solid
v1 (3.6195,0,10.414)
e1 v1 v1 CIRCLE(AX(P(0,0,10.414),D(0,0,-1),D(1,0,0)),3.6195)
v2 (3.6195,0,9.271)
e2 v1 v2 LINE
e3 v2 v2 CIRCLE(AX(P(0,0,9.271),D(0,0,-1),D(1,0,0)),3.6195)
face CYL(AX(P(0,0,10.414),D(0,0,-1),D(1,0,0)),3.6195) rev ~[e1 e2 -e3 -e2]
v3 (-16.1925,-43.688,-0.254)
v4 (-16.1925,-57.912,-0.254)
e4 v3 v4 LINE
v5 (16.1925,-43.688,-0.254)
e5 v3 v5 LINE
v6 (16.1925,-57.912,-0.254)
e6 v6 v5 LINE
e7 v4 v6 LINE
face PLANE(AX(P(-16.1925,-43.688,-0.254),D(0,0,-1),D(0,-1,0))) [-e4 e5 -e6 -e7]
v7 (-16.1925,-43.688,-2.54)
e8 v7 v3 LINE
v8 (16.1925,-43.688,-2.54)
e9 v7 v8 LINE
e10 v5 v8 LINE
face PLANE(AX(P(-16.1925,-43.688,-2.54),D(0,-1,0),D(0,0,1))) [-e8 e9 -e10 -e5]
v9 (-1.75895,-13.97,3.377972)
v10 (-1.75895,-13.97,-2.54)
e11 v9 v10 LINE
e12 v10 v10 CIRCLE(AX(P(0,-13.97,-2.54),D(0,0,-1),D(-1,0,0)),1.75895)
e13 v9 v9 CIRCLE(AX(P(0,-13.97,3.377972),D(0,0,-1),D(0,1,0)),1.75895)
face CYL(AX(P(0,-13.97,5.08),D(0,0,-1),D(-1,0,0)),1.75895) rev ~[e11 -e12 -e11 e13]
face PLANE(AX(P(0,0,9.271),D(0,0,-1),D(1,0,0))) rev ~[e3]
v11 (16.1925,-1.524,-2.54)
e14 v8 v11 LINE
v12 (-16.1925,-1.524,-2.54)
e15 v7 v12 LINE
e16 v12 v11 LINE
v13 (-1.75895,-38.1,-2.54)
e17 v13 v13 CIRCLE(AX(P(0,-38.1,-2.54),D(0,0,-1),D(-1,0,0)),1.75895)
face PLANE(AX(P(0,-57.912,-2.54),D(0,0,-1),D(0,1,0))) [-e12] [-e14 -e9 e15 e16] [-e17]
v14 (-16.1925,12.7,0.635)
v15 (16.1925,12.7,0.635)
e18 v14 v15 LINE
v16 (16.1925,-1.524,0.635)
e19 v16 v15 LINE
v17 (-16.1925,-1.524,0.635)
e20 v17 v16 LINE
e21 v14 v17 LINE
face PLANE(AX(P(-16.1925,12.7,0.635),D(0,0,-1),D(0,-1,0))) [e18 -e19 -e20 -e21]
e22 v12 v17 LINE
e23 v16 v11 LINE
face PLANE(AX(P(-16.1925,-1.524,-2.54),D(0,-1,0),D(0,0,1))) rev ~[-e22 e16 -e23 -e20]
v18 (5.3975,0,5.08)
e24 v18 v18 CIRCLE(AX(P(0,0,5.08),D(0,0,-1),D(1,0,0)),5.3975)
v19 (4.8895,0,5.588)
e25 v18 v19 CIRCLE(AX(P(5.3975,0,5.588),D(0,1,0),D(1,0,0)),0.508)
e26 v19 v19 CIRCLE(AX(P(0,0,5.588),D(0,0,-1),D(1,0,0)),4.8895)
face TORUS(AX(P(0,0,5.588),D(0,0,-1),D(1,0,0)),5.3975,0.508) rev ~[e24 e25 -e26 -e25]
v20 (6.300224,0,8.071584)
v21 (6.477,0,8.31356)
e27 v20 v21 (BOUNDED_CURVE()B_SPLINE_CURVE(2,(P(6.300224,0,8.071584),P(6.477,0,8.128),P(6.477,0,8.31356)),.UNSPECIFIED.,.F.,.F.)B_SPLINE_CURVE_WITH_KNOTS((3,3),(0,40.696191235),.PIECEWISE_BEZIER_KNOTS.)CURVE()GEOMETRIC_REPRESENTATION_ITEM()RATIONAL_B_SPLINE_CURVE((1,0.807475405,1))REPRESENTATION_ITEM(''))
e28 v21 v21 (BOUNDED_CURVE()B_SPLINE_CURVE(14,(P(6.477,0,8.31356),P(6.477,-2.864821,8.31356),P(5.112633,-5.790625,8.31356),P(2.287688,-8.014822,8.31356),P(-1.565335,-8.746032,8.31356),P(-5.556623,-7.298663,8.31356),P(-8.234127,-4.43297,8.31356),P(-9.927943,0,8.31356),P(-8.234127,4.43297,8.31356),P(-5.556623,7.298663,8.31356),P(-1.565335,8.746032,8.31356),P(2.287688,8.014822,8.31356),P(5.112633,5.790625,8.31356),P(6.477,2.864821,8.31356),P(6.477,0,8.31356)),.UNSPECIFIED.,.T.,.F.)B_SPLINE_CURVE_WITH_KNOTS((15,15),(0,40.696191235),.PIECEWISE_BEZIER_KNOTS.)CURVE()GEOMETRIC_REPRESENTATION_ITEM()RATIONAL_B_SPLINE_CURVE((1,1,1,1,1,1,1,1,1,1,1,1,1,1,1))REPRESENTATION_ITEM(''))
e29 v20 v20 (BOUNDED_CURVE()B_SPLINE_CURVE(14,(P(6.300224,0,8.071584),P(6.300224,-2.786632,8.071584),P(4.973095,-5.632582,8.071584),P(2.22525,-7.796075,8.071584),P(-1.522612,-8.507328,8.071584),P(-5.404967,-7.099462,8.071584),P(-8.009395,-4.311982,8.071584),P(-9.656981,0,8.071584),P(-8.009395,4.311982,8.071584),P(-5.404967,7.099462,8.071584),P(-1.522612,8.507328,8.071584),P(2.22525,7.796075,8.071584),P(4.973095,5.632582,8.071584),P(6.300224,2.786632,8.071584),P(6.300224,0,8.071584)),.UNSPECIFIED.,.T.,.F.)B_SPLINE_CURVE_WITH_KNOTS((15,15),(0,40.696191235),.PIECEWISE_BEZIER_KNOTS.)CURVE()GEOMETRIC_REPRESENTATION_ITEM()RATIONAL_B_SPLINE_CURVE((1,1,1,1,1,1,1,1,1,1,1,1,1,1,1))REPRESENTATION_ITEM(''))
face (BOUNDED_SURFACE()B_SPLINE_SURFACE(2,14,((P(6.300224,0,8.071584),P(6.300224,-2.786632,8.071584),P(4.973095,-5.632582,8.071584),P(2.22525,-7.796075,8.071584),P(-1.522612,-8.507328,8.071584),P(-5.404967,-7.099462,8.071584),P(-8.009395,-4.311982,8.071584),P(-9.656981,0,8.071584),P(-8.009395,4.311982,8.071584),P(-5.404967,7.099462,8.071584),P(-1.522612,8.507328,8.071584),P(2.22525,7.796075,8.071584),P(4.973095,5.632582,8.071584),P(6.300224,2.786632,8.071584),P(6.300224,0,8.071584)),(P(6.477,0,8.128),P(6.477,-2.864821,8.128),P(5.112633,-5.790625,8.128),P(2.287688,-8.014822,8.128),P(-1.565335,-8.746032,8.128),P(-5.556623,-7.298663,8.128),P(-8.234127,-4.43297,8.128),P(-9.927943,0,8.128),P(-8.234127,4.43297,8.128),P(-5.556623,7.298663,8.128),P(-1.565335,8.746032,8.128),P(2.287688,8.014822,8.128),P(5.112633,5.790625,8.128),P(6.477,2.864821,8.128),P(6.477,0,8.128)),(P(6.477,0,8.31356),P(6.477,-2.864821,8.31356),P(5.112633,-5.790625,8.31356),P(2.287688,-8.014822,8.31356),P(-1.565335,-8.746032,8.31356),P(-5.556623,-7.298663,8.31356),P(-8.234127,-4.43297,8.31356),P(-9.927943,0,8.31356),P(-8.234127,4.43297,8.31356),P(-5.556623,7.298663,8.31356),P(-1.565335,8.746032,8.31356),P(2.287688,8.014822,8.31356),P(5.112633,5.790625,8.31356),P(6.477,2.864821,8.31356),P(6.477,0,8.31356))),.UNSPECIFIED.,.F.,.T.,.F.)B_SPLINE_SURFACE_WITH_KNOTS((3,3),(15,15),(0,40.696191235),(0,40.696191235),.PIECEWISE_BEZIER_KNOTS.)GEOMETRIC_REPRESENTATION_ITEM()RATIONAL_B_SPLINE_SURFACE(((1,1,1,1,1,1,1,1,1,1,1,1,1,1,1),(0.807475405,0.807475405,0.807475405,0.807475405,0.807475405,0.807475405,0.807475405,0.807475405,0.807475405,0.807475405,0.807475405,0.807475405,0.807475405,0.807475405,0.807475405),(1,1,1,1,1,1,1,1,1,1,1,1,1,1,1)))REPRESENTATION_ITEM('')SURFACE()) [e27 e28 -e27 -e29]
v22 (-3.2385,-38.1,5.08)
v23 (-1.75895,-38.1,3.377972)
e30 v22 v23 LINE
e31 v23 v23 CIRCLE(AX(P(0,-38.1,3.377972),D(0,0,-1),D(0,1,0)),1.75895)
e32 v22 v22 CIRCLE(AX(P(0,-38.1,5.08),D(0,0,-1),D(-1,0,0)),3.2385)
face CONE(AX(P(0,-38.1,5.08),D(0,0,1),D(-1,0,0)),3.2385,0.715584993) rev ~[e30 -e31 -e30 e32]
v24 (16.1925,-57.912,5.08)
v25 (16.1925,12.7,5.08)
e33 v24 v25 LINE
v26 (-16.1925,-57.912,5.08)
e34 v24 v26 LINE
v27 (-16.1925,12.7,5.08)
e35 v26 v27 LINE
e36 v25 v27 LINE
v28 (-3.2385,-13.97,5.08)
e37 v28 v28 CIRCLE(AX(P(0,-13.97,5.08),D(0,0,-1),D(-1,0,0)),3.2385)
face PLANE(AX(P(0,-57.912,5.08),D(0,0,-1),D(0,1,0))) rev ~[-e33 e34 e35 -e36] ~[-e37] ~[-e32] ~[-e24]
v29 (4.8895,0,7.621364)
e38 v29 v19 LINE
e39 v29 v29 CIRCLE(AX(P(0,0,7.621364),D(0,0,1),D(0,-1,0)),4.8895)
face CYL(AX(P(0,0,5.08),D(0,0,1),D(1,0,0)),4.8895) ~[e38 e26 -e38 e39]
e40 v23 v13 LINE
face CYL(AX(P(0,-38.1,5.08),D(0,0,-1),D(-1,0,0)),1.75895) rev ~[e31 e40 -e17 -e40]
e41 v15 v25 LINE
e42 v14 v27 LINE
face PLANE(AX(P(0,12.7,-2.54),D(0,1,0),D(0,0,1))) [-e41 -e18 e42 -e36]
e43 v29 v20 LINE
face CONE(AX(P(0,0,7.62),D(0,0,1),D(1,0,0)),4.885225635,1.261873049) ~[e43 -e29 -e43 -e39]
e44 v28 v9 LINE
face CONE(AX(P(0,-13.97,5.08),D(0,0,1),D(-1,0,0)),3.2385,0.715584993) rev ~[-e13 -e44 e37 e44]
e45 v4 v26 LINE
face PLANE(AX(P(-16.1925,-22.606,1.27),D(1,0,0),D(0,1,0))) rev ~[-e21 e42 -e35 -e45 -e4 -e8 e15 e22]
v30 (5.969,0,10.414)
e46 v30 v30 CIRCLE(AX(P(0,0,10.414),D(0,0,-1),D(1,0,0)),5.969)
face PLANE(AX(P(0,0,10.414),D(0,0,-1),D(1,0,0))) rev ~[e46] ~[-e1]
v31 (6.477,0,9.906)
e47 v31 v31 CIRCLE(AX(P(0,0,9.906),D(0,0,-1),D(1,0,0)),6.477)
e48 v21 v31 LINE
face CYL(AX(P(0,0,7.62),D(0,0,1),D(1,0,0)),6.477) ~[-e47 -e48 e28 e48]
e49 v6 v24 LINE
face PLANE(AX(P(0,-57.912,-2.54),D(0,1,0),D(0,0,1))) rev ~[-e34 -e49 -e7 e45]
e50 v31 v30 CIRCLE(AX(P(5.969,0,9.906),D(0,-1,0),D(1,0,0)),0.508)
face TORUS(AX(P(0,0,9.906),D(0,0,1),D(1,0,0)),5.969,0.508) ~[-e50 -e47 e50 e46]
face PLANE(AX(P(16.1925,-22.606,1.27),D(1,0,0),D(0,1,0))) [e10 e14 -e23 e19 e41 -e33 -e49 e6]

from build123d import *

# Parameters (mm, degrees)
F2_R            = 0.508
F3_S5_R         = 4.8895
F3_T6_DEPTH     = 11
F4_R            = 0.254
F5_W            = 70.612
F5_H            = 7.62
F6_DEPTH        = 16.1925
F7_W            = 14.224
F7_H            = 3.175
F7_H_2          = 2.286
F8_DEPTH        = 32.386
F10_D           = 3.5179
F10_CSINK_D     = 6.477
F10_CSINK_ANGLE = 82


# Not quite as in the source:
# - a fillet or chamfer that OpenCascade refuses, or shapes differently, is made with other operations: its cross-section is extruded or revolved along the edge and cut away or added


with BuildPart() as f1:
    # F0 (on Front) → F1 (revolve)
    with BuildSketch(Plane.XZ):
        Polygon((0, 9.271), (0, 0), (11.1125, 0), (11.1125, 5.08), (4.8895, 5.08), (4.8895, 7.62), (6.477, 7.62), (6.477, 10.414), (3.6195, 10.414), (3.6195, 9.271), align=None)
    revolve(axis=Axis((0, 0, 5.207), (0, 0, -1)))

    # F2
    f2_edges = [f1.edges().sort_by_distance(p)[0] for p in [
        (-6.477, 0, 10.414),
        (-4.8895, 0, 5.08),
    ]]
    fillet(f2_edges, radius=F2_R)

    # F3: chamfer of 0.508 x 1.5917743649 on 1 edges, made by hand


with BuildPart() as f3_tool2:
    # F3_s3 → F3_t4 (revolve)
    with BuildSketch(Plane.XZ):
        Polygon((4.8852256351, 7.62), (6.477, 8.128), (6.477, 7.62), align=None)
    revolve(axis=Axis((0, 0, 7.62), (0, 0, -1)))

    # F3_s5 → F3_t6 (cut, symmetric)
    with BuildSketch(Plane.XY.offset(7.9)):
        Circle(F3_S5_R)
    extrude(amount=F3_T6_DEPTH, both=True, mode=Mode.SUBTRACT)


with BuildPart() as f1_1:
    add(f1.part)

    # F3_t1: cut F3_tool2
    add(f3_tool2.part, mode=Mode.SUBTRACT)

    # F4
    f4_edges = [f1_1.edges().sort_by_distance(p)[0] for p in [
        (-6.477, 0, 8.128),
    ]]
    fillet(f4_edges, radius=F4_R)

    # F5 (on Right) → F6 (join, symmetric)
    with BuildSketch(Plane.YZ):
        with Locations((-22.606, 1.27)):
            Rectangle(F5_W, F5_H)
    extrude(amount=F6_DEPTH, both=True)

    # F7 (on face) → F8 (cut, through all)
    with BuildSketch(Plane(origin=(-16.1925, 0, 0), x_dir=(0, -1, 0), z_dir=(-1, 0, 0))):
        with Locations((-5.588, -0.9525)):
            Rectangle(F7_W, F7_H)
        with Locations((50.8, -1.397)):
            Rectangle(F7_W, F7_H_2)
    extrude(amount=-F8_DEPTH, mode=Mode.SUBTRACT)

    # F10 (through all)
    with Locations(Plane.XY.offset(5.08)):
        with Locations((0, -13.97), (0, -38.1)):
            CounterSinkHole(F10_D / 2, F10_CSINK_D / 2, counter_sink_angle=F10_CSINK_ANGLE)


solid = f1_1.part
